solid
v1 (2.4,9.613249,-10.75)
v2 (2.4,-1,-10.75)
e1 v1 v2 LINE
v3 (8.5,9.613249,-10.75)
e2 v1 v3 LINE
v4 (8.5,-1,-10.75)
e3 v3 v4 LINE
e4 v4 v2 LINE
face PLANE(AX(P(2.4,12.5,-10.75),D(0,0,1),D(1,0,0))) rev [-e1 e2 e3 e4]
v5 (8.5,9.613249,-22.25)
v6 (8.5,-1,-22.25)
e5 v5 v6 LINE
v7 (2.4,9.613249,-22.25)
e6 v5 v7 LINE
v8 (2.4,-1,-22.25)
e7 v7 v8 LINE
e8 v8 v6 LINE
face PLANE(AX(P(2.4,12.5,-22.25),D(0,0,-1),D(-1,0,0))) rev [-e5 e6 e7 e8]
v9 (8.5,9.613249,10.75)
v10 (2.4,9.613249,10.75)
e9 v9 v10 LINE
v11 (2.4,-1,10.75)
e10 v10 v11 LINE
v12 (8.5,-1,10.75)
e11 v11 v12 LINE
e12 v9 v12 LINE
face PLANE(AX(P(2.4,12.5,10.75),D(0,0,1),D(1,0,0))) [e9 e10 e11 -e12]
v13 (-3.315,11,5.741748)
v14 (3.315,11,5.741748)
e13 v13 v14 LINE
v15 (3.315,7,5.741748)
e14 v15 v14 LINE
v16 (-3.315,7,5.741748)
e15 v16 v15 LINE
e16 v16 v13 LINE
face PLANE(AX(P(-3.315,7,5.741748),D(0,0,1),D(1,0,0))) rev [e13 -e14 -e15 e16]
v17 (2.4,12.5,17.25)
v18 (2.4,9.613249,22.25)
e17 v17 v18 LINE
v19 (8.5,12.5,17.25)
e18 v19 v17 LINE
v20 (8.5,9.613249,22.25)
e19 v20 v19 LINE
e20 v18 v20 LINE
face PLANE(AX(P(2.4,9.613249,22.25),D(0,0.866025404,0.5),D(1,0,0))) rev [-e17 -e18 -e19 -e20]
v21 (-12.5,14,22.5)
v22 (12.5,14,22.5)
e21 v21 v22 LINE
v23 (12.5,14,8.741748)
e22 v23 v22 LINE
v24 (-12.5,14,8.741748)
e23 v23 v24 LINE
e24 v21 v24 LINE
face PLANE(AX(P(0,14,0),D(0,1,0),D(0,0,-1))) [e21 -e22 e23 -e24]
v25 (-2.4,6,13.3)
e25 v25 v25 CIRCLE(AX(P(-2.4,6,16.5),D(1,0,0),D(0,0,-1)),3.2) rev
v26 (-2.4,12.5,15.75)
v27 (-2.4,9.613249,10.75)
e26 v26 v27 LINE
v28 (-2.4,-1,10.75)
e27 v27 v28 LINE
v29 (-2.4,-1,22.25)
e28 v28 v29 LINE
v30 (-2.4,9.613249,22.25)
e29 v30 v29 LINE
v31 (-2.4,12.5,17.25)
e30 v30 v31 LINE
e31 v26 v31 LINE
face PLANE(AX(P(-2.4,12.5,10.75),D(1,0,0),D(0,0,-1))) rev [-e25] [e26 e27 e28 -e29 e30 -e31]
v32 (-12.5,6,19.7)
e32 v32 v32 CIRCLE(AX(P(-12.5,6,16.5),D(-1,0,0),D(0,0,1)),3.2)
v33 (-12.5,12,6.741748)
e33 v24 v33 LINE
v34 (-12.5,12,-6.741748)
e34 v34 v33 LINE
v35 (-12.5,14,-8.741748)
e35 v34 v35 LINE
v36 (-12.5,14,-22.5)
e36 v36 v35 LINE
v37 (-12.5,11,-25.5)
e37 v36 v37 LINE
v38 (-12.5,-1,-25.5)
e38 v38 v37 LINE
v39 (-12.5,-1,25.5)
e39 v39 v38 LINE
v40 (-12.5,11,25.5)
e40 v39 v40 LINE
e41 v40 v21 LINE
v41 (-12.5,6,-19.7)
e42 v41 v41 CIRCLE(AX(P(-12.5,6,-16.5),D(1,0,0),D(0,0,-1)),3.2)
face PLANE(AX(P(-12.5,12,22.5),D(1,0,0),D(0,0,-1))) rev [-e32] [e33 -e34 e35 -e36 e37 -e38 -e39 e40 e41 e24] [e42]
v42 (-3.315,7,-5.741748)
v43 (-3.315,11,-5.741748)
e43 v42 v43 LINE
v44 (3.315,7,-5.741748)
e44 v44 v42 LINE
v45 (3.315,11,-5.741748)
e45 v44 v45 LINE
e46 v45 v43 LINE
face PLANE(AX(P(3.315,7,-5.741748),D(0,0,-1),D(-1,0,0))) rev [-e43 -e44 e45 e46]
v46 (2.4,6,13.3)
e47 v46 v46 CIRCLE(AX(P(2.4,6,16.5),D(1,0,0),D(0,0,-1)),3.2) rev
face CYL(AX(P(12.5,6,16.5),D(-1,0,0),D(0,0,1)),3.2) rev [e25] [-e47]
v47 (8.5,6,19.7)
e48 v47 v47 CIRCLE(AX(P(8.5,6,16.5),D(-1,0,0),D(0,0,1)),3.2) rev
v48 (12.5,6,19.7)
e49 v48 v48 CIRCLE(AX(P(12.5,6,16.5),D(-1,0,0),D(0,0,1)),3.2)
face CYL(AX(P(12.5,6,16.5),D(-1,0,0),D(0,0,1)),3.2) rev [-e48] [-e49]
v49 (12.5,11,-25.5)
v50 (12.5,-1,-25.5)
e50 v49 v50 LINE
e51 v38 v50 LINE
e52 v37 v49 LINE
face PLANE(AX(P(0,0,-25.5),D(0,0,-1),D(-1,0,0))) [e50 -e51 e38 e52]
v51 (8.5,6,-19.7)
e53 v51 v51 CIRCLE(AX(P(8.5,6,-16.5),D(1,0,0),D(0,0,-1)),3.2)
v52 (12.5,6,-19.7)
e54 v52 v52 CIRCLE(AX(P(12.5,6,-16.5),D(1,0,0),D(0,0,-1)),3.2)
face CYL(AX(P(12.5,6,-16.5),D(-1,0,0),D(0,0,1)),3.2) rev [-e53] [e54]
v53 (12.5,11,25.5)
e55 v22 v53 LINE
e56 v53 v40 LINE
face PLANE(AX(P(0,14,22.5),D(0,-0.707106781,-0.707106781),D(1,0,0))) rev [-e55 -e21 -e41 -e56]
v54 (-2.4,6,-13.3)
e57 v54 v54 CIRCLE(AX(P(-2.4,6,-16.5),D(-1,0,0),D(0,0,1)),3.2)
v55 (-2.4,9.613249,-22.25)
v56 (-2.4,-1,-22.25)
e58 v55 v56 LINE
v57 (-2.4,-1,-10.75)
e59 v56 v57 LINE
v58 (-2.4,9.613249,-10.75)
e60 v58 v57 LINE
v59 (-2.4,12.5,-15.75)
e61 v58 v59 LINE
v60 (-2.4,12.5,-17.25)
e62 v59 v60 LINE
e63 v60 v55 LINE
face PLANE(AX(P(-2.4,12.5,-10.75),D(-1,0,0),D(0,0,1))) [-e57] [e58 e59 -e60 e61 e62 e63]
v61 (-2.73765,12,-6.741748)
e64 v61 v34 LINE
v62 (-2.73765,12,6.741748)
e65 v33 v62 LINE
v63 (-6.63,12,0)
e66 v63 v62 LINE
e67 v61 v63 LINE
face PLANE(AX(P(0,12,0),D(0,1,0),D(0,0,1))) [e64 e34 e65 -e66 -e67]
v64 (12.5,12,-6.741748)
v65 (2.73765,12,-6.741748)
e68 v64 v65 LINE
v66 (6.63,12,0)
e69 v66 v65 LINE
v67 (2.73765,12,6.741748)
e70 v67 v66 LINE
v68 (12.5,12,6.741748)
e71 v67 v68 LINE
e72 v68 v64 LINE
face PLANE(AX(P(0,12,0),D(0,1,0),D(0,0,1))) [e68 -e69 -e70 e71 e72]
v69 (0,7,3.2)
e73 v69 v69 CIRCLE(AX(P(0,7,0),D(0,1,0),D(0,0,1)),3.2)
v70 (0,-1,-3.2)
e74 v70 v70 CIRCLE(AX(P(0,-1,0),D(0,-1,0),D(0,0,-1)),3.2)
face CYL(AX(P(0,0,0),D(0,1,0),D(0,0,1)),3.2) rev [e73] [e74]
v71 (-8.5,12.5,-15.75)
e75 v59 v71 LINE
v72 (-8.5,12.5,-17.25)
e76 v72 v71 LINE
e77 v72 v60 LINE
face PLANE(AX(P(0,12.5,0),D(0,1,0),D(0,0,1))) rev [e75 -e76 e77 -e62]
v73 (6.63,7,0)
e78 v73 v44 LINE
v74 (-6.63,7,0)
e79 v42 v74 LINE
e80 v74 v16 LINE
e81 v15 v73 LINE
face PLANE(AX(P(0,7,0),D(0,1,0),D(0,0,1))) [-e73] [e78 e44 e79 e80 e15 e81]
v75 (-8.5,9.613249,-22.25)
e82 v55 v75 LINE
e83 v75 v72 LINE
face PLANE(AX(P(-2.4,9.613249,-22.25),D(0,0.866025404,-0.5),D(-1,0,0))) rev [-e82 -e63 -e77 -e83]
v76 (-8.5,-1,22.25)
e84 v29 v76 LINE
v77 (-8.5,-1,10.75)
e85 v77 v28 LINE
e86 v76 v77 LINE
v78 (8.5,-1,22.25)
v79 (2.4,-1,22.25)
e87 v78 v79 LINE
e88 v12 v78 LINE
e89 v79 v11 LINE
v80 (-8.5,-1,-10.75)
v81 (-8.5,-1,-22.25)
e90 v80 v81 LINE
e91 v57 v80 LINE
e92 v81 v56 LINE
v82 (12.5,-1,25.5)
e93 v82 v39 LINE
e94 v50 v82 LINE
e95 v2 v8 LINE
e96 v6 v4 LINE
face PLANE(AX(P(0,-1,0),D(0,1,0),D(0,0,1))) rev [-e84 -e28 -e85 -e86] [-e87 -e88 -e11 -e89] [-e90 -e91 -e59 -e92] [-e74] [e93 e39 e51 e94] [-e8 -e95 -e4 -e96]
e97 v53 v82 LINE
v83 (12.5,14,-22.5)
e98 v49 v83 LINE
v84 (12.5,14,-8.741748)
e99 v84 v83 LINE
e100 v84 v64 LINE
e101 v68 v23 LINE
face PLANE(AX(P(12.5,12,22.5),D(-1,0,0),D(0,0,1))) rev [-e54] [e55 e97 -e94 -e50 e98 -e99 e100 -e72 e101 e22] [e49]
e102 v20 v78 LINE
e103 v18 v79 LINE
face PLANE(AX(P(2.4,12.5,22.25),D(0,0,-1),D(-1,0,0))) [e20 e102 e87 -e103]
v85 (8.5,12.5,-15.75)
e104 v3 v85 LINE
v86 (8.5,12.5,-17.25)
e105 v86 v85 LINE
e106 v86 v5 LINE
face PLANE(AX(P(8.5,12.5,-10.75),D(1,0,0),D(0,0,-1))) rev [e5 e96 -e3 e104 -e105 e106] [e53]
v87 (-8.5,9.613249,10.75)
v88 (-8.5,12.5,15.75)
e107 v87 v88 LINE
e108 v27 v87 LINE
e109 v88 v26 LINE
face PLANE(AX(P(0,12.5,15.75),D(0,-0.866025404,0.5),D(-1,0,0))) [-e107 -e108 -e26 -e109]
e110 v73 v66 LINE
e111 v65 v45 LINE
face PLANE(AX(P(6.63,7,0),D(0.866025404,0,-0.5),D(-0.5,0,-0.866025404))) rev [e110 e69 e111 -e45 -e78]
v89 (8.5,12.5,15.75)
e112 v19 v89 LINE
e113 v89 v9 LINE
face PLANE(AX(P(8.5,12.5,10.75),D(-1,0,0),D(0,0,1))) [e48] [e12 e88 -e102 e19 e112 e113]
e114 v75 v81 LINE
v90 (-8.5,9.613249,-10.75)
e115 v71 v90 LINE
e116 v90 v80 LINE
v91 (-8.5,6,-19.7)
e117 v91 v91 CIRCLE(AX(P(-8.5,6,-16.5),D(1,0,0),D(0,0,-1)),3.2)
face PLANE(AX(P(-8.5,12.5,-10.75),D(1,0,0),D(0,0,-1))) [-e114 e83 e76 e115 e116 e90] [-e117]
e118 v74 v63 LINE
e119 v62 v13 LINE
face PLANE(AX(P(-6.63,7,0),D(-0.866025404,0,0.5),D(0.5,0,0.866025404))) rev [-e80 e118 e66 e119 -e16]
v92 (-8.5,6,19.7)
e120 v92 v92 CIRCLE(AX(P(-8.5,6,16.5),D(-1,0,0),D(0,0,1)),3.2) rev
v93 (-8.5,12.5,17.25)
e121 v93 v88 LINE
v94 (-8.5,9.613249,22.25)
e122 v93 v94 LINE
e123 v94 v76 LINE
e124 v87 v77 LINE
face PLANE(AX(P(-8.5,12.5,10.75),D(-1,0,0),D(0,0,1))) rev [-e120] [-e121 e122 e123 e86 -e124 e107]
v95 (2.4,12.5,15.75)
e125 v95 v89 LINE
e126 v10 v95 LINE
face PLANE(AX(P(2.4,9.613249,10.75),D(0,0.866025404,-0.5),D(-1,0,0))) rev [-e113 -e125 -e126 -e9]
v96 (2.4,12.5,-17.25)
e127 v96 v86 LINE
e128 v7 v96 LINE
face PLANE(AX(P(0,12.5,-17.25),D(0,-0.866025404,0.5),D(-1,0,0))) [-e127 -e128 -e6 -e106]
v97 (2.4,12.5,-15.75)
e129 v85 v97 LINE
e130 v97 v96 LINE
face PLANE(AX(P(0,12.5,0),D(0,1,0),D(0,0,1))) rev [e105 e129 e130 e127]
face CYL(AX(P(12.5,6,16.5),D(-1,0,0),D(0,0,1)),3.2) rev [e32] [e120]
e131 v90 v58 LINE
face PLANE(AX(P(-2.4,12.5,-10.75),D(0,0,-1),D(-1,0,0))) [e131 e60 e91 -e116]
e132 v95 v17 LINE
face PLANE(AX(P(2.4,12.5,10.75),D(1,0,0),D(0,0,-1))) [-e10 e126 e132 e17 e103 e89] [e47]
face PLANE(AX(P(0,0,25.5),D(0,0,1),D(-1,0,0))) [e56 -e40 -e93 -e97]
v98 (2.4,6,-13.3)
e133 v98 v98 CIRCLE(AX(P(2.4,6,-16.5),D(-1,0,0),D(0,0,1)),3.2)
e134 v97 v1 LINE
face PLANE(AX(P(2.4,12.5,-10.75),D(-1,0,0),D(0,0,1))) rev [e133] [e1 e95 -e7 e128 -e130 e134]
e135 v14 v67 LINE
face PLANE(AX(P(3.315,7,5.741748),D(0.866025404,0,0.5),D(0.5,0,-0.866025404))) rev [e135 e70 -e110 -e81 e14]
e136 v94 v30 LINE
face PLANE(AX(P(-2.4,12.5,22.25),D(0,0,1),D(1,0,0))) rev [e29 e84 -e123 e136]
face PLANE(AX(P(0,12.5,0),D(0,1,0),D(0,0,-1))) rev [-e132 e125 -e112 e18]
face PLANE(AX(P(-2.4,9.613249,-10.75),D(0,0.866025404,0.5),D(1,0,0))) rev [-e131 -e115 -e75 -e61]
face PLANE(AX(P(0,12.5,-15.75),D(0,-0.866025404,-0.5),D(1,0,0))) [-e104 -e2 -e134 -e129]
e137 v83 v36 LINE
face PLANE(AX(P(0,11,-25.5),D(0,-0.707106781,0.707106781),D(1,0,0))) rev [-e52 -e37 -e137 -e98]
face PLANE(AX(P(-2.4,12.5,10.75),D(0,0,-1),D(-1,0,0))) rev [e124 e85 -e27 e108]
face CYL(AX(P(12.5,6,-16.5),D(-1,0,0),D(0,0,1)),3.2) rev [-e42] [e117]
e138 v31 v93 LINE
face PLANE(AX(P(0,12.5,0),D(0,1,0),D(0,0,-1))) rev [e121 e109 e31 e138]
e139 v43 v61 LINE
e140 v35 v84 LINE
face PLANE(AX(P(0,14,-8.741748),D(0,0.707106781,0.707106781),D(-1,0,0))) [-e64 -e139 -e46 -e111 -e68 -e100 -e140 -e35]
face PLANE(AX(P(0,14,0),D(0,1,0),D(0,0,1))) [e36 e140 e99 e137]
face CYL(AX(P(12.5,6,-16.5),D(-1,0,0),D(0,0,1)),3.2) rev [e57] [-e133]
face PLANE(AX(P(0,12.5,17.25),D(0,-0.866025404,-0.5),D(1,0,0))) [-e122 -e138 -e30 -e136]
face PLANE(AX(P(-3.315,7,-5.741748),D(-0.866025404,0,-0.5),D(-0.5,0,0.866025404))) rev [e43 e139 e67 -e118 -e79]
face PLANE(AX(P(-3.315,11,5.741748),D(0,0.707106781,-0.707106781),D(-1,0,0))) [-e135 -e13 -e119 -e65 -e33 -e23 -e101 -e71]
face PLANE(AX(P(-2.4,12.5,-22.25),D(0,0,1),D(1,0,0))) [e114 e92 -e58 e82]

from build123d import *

# Parameters (mm, degrees)
SKETCH1_W                    = 25
SKETCH1_H                    = 45
BOSS_EXTRUDE1_DEPTH          = 12
CUT_EXTRUDE1_DEPTH           = 5
SKETCH3_R                    = 3.2
CUT_EXTRUDE2_DEPTH           = 27.673957337
SKETCH8_R                    = 3.2
CUT_EXTRUDE5_DEPTH           = 36.710642671
SKETCH9_W                    = 25
SKETCH9_H                    = 16.758251573
BOSS_EXTRUDE2_DEPTH          = 2
SKETCH12_W                   = 6.1
SKETCH12_H                   = 11.5
CUT_EXTRUDE6_DEPTH           = 12.5
CHAMFER1_SIZE                = 5
CHAMFER1_SIZE2               = 2.886751346
SKETCH14_W                   = 25
SKETCH14_H                   = 14
BOSS_EXTRUDE3_DEPTH          = 3
CHAMFER1_OF_MIRROR2_SIZE2    = 5
CHAMFER1_OF_MIRROR2_SIZE     = 2.886751346
MIRROR3_START                = -8.5
MIRROR3_OUTLINE_R            = 3.2
MIRROR3_DEPTH                = 6.1
MIRROR3_START_2              = 2.4
MIRROR3_2_OUTLINE_R          = 3.2
MIRROR3_2_DEPTH              = 6.1
MIRROR3_START_3              = -12.5
MIRROR3_3_DEPTH              = 25
MIRROR3_START_4              = -2.4
MIRROR3_4_DEPTH              = 4.8
MIRROR3_5_DEPTH              = 4
MIRROR3_START_5              = 8.5
MIRROR3_6_DEPTH              = 4
CHAMFER2_SIZE                = 3
SKETCH17_W                   = 25
SKETCH17_H                   = 51
SKETCH17_R                   = 3.2
SKETCH17_W_2                 = 6.1
SKETCH17_H_2                 = 11.5
EXTRA_1MM_BASE_EXTRUDE_DEPTH = 1


# Read off the part's stored shape, not the designer's step: Mirror3
with BuildPart() as part:
    # Sketch1 → Boss-Extrude1 (new body)
    with BuildSketch(Plane(origin=(0, 0, 0), x_dir=(1, 0, 0), z_dir=(0, 1, 0))):
        Rectangle(SKETCH1_W, SKETCH1_H)
    extrude(amount=BOSS_EXTRUDE1_DEPTH)

    # Sketch2 → Cut-Extrude1 (cut)
    with BuildSketch(Plane(origin=(0, 12, 0), x_dir=(1, 0, 0), z_dir=(0, 1, 0))):
        Polygon((3.315, -5.741748427), (6.63, 0), (3.315, 5.741748427), (-3.315, 5.741748427), (-6.63, 0), (-3.315, -5.741748427), align=None)
    extrude(amount=-CUT_EXTRUDE1_DEPTH, mode=Mode.SUBTRACT)

    # Sketch3 → Cut-Extrude2 (cut, through all)
    with BuildSketch(Plane(origin=(0, 7, 0), x_dir=(1, 0, 0), z_dir=(0, 1, 0))):
        with Locations(Location((0, 0, 0), (0, 0, 270))):
            Circle(SKETCH3_R)
    extrude(amount=-CUT_EXTRUDE2_DEPTH, mode=Mode.SUBTRACT)

    # Sketch8 → Cut-Extrude5 (cut, through all)
    with BuildSketch(Plane.ZY.offset(12.5)):
        with Locations((16.5, 6)):
            Circle(SKETCH8_R)
    cut_extrude5 = extrude(amount=-CUT_EXTRUDE5_DEPTH, mode=Mode.SUBTRACT)

    # Mirror1: Cut-Extrude5 across plane
    add(cut_extrude5.mirror(Plane.XY), mode=Mode.SUBTRACT)

    # Sketch9 → Boss-Extrude2 (add)
    with BuildSketch(Plane(origin=(0, 12, 0), x_dir=(1, 0, 0), z_dir=(0, 1, 0))):
        with Locations((0, 14.120874214)):
            Rectangle(SKETCH9_W, SKETCH9_H)
    extrude(amount=BOSS_EXTRUDE2_DEPTH)

    # Sketch12 → Cut-Extrude6 (cut)
    with BuildSketch(Plane(origin=(0, 0, 0), x_dir=(1, 0, 0), z_dir=(0, 1, 0))):
        with Locations((-5.45, 16.5)):
            Rectangle(SKETCH12_W, SKETCH12_H)
    cut_extrude6 = extrude(amount=CUT_EXTRUDE6_DEPTH, mode=Mode.SUBTRACT)

    # Chamfer1
    chamfer1_edges = [part.edges().sort_by_distance(p)[0] for p in [
        (-5.45, 12.5, -10.75),
        (-5.45, 12.5, -22.25),
    ]]
    chamfer1_side = [part.faces().sort_by_distance(p)[0] for p in [
        (-5.45, 12.5, -16.5),
    ]]
    chamfer(chamfer1_edges, length=CHAMFER1_SIZE, length2=CHAMFER1_SIZE2, reference=chamfer1_side[0])

    # Sketch14 → Boss-Extrude3 (add)
    with BuildSketch(Plane(origin=(0, 0, -22.5), x_dir=(-1, 0, 0), z_dir=(0, 0, -1))):
        with Locations((0, 7)):
            Rectangle(SKETCH14_W, SKETCH14_H)
    extrude(amount=BOSS_EXTRUDE3_DEPTH)

    # Mirror2: Cut-Extrude6 across plane
    add(cut_extrude6.mirror(Plane(origin=(0, 0, 0), x_dir=(0, 0, 1), z_dir=(1, 0, 0))), mode=Mode.SUBTRACT)

    # Chamfer1 of Mirror2
    chamfer1_of_mirror2_edges = [part.edges().sort_by_distance(p)[0] for p in [
        (5.45, 12.5, -10.75),
        (5.45, 12.5, -22.25),
    ]]
    chamfer(chamfer1_of_mirror2_edges, length=CHAMFER1_OF_MIRROR2_SIZE, length2=CHAMFER1_OF_MIRROR2_SIZE2)

    # Mirror3 outline → Mirror3 (cut)
    with BuildSketch(Plane.YZ.offset(MIRROR3_START)):
        Polygon((9.613248654, 10.75), (12, 14.883974596), (12, 18.116025404), (9.613248654, 22.25), (0, 22.25), (0, 10.75), align=None)
        with Locations((6, 16.5)):
            Circle(MIRROR3_OUTLINE_R, mode=Mode.SUBTRACT)
    extrude(amount=MIRROR3_DEPTH, mode=Mode.SUBTRACT)

    # Mirror3 2 outline → Mirror3 2 (cut)
    with BuildSketch(Plane.YZ.offset(MIRROR3_START_2)):
        Polygon((9.613248654, 10.75), (12, 14.883974596), (12, 18.116025404), (9.613248654, 22.25), (0, 22.25), (0, 10.75), align=None)
        with Locations((6, 16.5)):
            Circle(MIRROR3_2_OUTLINE_R, mode=Mode.SUBTRACT)
    extrude(amount=MIRROR3_2_DEPTH, mode=Mode.SUBTRACT)

    # Mirror3 3 outline → Mirror3 3 (add)
    with BuildSketch(Plane.YZ.offset(MIRROR3_START_3)):
        Polygon((12, 5.741748427), (14, 5.741748427), (14, 25.5), (0, 25.5), (0, 22.5), (12, 22.5), (12, 18.116025404), (12.5, 17.25), (12.5, 15.75), (12, 14.883974596), align=None)
    extrude(amount=MIRROR3_3_DEPTH)

    # Mirror3 4 outline → Mirror3 4 (add)
    with BuildSketch(Plane.YZ.offset(MIRROR3_START_4)):
        Polygon((12, 18.116025404), (12, 14.883974596), (12.5, 15.75), (12.5, 17.25), align=None)
    extrude(amount=MIRROR3_4_DEPTH)

    # Mirror3 5 outline → Mirror3 5 (add)
    with BuildSketch(Plane.YZ.offset(MIRROR3_START_3)):
        Polygon((12, 18.116025404), (12, 14.883974596), (12.5, 15.75), (12.5, 17.25), align=None)
    extrude(amount=MIRROR3_5_DEPTH)

    # Mirror3 6 outline → Mirror3 6 (add)
    with BuildSketch(Plane.YZ.offset(MIRROR3_START_5)):
        Polygon((12, 18.116025404), (12, 14.883974596), (12.5, 15.75), (12.5, 17.25), align=None)
    extrude(amount=MIRROR3_6_DEPTH)

    # Chamfer2
    # the kernel refuses this chamfer: 3 mm, written as the material it takes off along each edge
    with BuildSketch(Plane(origin=(20.215048964, 14, -5.741748427), x_dir=(0, -0.9996219169112969, 0.027495876610586497), z_dir=(-1, 0, 0))) as chamfer2_piece_1_section:
        Polygon((CHAMFER2_SIZE * 0.999621916911, -CHAMFER2_SIZE * 0.0274958766106), (-CHAMFER2_SIZE * 0.0274958766106, -CHAMFER2_SIZE * 0.999621916911), (0, 0), align=None)
    chamfer2_piece_1 = extrude(amount=40.430097928, mode=Mode.PRIVATE)
    chamfer2_piece_1 = split(chamfer2_piece_1, bisect_by=Plane(origin=(11.444466888, 12, -6.852192504), z_dir=(0, 1, 0)), keep=Keep.TOP, mode=Mode.PRIVATE)
    chamfer2_piece_1 = split(chamfer2_piece_1, bisect_by=Plane(origin=(4.866530332, 13.212813285, -3.054419063), z_dir=(0.8660254037844385, 0, -0.5000000000000003)), keep=Keep.TOP, mode=Mode.PRIVATE)
    add(chamfer2_piece_1, mode=Mode.SUBTRACT)
    with BuildSketch(Plane(origin=(20.215048964, 14, -5.741748427), x_dir=(0, -0.9996219169112969, 0.027495876610586497), z_dir=(-1, 0, 0))) as chamfer2_piece_2_section:
        Polygon((CHAMFER2_SIZE * 0.999621916911, -CHAMFER2_SIZE * 0.0274958766106), (-CHAMFER2_SIZE * 0.0274958766106, -CHAMFER2_SIZE * 0.999621916911), (0, 0), align=None)
    chamfer2_piece_2 = extrude(amount=40.430097928, mode=Mode.PRIVATE)
    chamfer2_piece_2 = split(chamfer2_piece_2, bisect_by=Plane(origin=(0, 12, -5.991035204), z_dir=(0, -1, 0)), keep=Keep.TOP, mode=Mode.PRIVATE)
    chamfer2_piece_2 = split(chamfer2_piece_2, bisect_by=Plane(origin=(-2.378305659, 11.613346541, -7.364150617), z_dir=(0.8660254037844387, 0, 0.5000000000000001)), keep=Keep.TOP, mode=Mode.PRIVATE)
    chamfer2_piece_2 = split(chamfer2_piece_2, bisect_by=Plane(origin=(2.378305659, 11.613346541, -7.364150617), z_dir=(-0.8660254037844385, 0, 0.5000000000000003)), keep=Keep.TOP, mode=Mode.PRIVATE)
    add(chamfer2_piece_2, mode=Mode.SUBTRACT)
    with BuildSketch(Plane(origin=(20.215048964, 14, -5.741748427), x_dir=(0, -0.9996219169112969, 0.027495876610586497), z_dir=(-1, 0, 0))) as chamfer2_piece_3_section:
        Polygon((CHAMFER2_SIZE * 0.999621916911, -CHAMFER2_SIZE * 0.0274958766106), (-CHAMFER2_SIZE * 0.0274958766106, -CHAMFER2_SIZE * 0.999621916911), (0, 0), align=None)
    chamfer2_piece_3 = extrude(amount=40.430097928, mode=Mode.PRIVATE)
    chamfer2_piece_3 = split(chamfer2_piece_3, bisect_by=Plane(origin=(0, 12, -6.713987666), z_dir=(0, 1, 0)), keep=Keep.TOP, mode=Mode.PRIVATE)
    chamfer2_piece_3 = split(chamfer2_piece_3, bisect_by=Plane(origin=(-2.06525806, 13.168089522, -7.906364963), z_dir=(0.8660254037844387, 0, 0.5000000000000001)), keep=Keep.TOP, mode=Mode.PRIVATE)
    chamfer2_piece_3 = split(chamfer2_piece_3, bisect_by=Plane(origin=(2.06525806, 13.168089522, -7.906364963), z_dir=(-0.8660254037844385, 0, 0.5000000000000003)), keep=Keep.TOP, mode=Mode.PRIVATE)
    add(chamfer2_piece_3, mode=Mode.SUBTRACT)
    with BuildSketch(Plane(origin=(20.215048964, 14, -5.741748427), x_dir=(0, -0.9996219169112969, 0.027495876610586497), z_dir=(-1, 0, 0))) as chamfer2_piece_4_section:
        Polygon((CHAMFER2_SIZE * 0.999621916911, -CHAMFER2_SIZE * 0.0274958766106), (-CHAMFER2_SIZE * 0.0274958766106, -CHAMFER2_SIZE * 0.999621916911), (0, 0), align=None)
    chamfer2_piece_4 = extrude(amount=40.430097928, mode=Mode.PRIVATE)
    chamfer2_piece_4 = split(chamfer2_piece_4, bisect_by=Plane(origin=(-11.444466888, 12, -6.852192504), z_dir=(0, 1, 0)), keep=Keep.TOP, mode=Mode.PRIVATE)
    chamfer2_piece_4 = split(chamfer2_piece_4, bisect_by=Plane(origin=(-4.866530332, 13.212813285, -3.054419063), z_dir=(-0.8660254037844387, 0, -0.5000000000000001)), keep=Keep.TOP, mode=Mode.PRIVATE)
    add(chamfer2_piece_4, mode=Mode.SUBTRACT)
    with BuildSketch(Plane(origin=(-20.215048964, 14, 25.5), x_dir=(0, -0.9996219169112968, 0.02749587661058678), z_dir=(1, 0, 0)), Plane(origin=(20.215048964, 14, -25.5), x_dir=(0, -0.9996219169112968, -0.02749587661058678), z_dir=(-1, 0, 0))) as chamfer2_piece_5:
        Polygon((CHAMFER2_SIZE * 0.999621916911, CHAMFER2_SIZE * 0.0274958766106), (-CHAMFER2_SIZE * 0.0274958766106, CHAMFER2_SIZE * 0.999621916911), (0, 0), align=None)
    extrude(amount=40.430097928, mode=Mode.SUBTRACT)
    with BuildSketch(Plane(origin=(-20.215048964, 14, 5.741748427), x_dir=(0, -0.9996219169112969, -0.027495876610586497), z_dir=(1, 0, 0))) as chamfer2_piece_6_section:
        Polygon((CHAMFER2_SIZE * 0.999621916911, -CHAMFER2_SIZE * 0.0274958766106), (-CHAMFER2_SIZE * 0.0274958766106, -CHAMFER2_SIZE * 0.999621916911), (0, 0), align=None)
    chamfer2_piece_6 = extrude(amount=40.430097928, mode=Mode.PRIVATE)
    chamfer2_piece_6 = split(chamfer2_piece_6, bisect_by=Plane(origin=(-11.444466888, 12, 6.852192504), z_dir=(0, 1, 0)), keep=Keep.TOP, mode=Mode.PRIVATE)
    chamfer2_piece_6 = split(chamfer2_piece_6, bisect_by=Plane(origin=(-4.866530332, 13.212813285, 3.054419063), z_dir=(-0.8660254037844385, 0, 0.5000000000000004)), keep=Keep.TOP, mode=Mode.PRIVATE)
    add(chamfer2_piece_6, mode=Mode.SUBTRACT)
    with BuildSketch(Plane(origin=(-20.215048964, 14, 5.741748427), x_dir=(0, -0.9996219169112969, -0.027495876610586497), z_dir=(1, 0, 0))) as chamfer2_piece_7_section:
        Polygon((CHAMFER2_SIZE * 0.999621916911, -CHAMFER2_SIZE * 0.0274958766106), (-CHAMFER2_SIZE * 0.0274958766106, -CHAMFER2_SIZE * 0.999621916911), (0, 0), align=None)
    chamfer2_piece_7 = extrude(amount=40.430097928, mode=Mode.PRIVATE)
    chamfer2_piece_7 = split(chamfer2_piece_7, bisect_by=Plane(origin=(0, 12, 5.991035204), z_dir=(0, -1, 0)), keep=Keep.TOP, mode=Mode.PRIVATE)
    chamfer2_piece_7 = split(chamfer2_piece_7, bisect_by=Plane(origin=(-2.378305659, 11.613346541, 7.364150617), z_dir=(0.8660254037844385, 0, -0.5000000000000004)), keep=Keep.TOP, mode=Mode.PRIVATE)
    chamfer2_piece_7 = split(chamfer2_piece_7, bisect_by=Plane(origin=(2.378305659, 11.613346541, 7.364150617), z_dir=(-0.8660254037844385, 0, -0.5000000000000004)), keep=Keep.TOP, mode=Mode.PRIVATE)
    add(chamfer2_piece_7, mode=Mode.SUBTRACT)
    with BuildSketch(Plane(origin=(-20.215048964, 14, 5.741748427), x_dir=(0, -0.9996219169112969, -0.027495876610586497), z_dir=(1, 0, 0))) as chamfer2_piece_8_section:
        Polygon((CHAMFER2_SIZE * 0.999621916911, -CHAMFER2_SIZE * 0.0274958766106), (-CHAMFER2_SIZE * 0.0274958766106, -CHAMFER2_SIZE * 0.999621916911), (0, 0), align=None)
    chamfer2_piece_8 = extrude(amount=40.430097928, mode=Mode.PRIVATE)
    chamfer2_piece_8 = split(chamfer2_piece_8, bisect_by=Plane(origin=(0, 12, 6.713987666), z_dir=(0, 1, 0)), keep=Keep.TOP, mode=Mode.PRIVATE)
    chamfer2_piece_8 = split(chamfer2_piece_8, bisect_by=Plane(origin=(-2.06525806, 13.168089522, 7.906364963), z_dir=(0.8660254037844385, 0, -0.5000000000000004)), keep=Keep.TOP, mode=Mode.PRIVATE)
    chamfer2_piece_8 = split(chamfer2_piece_8, bisect_by=Plane(origin=(2.06525806, 13.168089522, 7.906364963), z_dir=(-0.8660254037844385, 0, -0.5000000000000004)), keep=Keep.TOP, mode=Mode.PRIVATE)
    add(chamfer2_piece_8, mode=Mode.SUBTRACT)
    with BuildSketch(Plane(origin=(-20.215048964, 14, 5.741748427), x_dir=(0, -0.9996219169112969, -0.027495876610586497), z_dir=(1, 0, 0))) as chamfer2_piece_9_section:
        Polygon((CHAMFER2_SIZE * 0.999621916911, -CHAMFER2_SIZE * 0.0274958766106), (-CHAMFER2_SIZE * 0.0274958766106, -CHAMFER2_SIZE * 0.999621916911), (0, 0), align=None)
    chamfer2_piece_9 = extrude(amount=40.430097928, mode=Mode.PRIVATE)
    chamfer2_piece_9 = split(chamfer2_piece_9, bisect_by=Plane(origin=(11.444466888, 12, 6.852192504), z_dir=(0, 1, 0)), keep=Keep.TOP, mode=Mode.PRIVATE)
    chamfer2_piece_9 = split(chamfer2_piece_9, bisect_by=Plane(origin=(4.866530332, 13.212813285, 3.054419063), z_dir=(0.8660254037844385, 0, 0.5000000000000004)), keep=Keep.TOP, mode=Mode.PRIVATE)
    add(chamfer2_piece_9, mode=Mode.SUBTRACT)

    # Sketch17 → Extra 1mm base extrude (add)
    with BuildSketch(Plane.XZ):
        Rectangle(SKETCH17_W, SKETCH17_H)
        with Locations(Location((0, 0, 0), (0, 0, 90))):
            Circle(SKETCH17_R, mode=Mode.SUBTRACT)
        with Locations((-5.45, 16.5)):
            Rectangle(SKETCH17_W_2, SKETCH17_H_2, mode=Mode.SUBTRACT)
        with Locations((5.45, 16.5)):
            Rectangle(SKETCH17_W_2, SKETCH17_H_2, mode=Mode.SUBTRACT)
        with Locations((5.45, -16.5)):
            Rectangle(SKETCH17_W_2, SKETCH17_H_2, mode=Mode.SUBTRACT)
        with Locations((-5.45, -16.5)):
            Rectangle(SKETCH17_W_2, SKETCH17_H_2, mode=Mode.SUBTRACT)
    extrude(amount=EXTRA_1MM_BASE_EXTRUDE_DEPTH)


solid = part.part
